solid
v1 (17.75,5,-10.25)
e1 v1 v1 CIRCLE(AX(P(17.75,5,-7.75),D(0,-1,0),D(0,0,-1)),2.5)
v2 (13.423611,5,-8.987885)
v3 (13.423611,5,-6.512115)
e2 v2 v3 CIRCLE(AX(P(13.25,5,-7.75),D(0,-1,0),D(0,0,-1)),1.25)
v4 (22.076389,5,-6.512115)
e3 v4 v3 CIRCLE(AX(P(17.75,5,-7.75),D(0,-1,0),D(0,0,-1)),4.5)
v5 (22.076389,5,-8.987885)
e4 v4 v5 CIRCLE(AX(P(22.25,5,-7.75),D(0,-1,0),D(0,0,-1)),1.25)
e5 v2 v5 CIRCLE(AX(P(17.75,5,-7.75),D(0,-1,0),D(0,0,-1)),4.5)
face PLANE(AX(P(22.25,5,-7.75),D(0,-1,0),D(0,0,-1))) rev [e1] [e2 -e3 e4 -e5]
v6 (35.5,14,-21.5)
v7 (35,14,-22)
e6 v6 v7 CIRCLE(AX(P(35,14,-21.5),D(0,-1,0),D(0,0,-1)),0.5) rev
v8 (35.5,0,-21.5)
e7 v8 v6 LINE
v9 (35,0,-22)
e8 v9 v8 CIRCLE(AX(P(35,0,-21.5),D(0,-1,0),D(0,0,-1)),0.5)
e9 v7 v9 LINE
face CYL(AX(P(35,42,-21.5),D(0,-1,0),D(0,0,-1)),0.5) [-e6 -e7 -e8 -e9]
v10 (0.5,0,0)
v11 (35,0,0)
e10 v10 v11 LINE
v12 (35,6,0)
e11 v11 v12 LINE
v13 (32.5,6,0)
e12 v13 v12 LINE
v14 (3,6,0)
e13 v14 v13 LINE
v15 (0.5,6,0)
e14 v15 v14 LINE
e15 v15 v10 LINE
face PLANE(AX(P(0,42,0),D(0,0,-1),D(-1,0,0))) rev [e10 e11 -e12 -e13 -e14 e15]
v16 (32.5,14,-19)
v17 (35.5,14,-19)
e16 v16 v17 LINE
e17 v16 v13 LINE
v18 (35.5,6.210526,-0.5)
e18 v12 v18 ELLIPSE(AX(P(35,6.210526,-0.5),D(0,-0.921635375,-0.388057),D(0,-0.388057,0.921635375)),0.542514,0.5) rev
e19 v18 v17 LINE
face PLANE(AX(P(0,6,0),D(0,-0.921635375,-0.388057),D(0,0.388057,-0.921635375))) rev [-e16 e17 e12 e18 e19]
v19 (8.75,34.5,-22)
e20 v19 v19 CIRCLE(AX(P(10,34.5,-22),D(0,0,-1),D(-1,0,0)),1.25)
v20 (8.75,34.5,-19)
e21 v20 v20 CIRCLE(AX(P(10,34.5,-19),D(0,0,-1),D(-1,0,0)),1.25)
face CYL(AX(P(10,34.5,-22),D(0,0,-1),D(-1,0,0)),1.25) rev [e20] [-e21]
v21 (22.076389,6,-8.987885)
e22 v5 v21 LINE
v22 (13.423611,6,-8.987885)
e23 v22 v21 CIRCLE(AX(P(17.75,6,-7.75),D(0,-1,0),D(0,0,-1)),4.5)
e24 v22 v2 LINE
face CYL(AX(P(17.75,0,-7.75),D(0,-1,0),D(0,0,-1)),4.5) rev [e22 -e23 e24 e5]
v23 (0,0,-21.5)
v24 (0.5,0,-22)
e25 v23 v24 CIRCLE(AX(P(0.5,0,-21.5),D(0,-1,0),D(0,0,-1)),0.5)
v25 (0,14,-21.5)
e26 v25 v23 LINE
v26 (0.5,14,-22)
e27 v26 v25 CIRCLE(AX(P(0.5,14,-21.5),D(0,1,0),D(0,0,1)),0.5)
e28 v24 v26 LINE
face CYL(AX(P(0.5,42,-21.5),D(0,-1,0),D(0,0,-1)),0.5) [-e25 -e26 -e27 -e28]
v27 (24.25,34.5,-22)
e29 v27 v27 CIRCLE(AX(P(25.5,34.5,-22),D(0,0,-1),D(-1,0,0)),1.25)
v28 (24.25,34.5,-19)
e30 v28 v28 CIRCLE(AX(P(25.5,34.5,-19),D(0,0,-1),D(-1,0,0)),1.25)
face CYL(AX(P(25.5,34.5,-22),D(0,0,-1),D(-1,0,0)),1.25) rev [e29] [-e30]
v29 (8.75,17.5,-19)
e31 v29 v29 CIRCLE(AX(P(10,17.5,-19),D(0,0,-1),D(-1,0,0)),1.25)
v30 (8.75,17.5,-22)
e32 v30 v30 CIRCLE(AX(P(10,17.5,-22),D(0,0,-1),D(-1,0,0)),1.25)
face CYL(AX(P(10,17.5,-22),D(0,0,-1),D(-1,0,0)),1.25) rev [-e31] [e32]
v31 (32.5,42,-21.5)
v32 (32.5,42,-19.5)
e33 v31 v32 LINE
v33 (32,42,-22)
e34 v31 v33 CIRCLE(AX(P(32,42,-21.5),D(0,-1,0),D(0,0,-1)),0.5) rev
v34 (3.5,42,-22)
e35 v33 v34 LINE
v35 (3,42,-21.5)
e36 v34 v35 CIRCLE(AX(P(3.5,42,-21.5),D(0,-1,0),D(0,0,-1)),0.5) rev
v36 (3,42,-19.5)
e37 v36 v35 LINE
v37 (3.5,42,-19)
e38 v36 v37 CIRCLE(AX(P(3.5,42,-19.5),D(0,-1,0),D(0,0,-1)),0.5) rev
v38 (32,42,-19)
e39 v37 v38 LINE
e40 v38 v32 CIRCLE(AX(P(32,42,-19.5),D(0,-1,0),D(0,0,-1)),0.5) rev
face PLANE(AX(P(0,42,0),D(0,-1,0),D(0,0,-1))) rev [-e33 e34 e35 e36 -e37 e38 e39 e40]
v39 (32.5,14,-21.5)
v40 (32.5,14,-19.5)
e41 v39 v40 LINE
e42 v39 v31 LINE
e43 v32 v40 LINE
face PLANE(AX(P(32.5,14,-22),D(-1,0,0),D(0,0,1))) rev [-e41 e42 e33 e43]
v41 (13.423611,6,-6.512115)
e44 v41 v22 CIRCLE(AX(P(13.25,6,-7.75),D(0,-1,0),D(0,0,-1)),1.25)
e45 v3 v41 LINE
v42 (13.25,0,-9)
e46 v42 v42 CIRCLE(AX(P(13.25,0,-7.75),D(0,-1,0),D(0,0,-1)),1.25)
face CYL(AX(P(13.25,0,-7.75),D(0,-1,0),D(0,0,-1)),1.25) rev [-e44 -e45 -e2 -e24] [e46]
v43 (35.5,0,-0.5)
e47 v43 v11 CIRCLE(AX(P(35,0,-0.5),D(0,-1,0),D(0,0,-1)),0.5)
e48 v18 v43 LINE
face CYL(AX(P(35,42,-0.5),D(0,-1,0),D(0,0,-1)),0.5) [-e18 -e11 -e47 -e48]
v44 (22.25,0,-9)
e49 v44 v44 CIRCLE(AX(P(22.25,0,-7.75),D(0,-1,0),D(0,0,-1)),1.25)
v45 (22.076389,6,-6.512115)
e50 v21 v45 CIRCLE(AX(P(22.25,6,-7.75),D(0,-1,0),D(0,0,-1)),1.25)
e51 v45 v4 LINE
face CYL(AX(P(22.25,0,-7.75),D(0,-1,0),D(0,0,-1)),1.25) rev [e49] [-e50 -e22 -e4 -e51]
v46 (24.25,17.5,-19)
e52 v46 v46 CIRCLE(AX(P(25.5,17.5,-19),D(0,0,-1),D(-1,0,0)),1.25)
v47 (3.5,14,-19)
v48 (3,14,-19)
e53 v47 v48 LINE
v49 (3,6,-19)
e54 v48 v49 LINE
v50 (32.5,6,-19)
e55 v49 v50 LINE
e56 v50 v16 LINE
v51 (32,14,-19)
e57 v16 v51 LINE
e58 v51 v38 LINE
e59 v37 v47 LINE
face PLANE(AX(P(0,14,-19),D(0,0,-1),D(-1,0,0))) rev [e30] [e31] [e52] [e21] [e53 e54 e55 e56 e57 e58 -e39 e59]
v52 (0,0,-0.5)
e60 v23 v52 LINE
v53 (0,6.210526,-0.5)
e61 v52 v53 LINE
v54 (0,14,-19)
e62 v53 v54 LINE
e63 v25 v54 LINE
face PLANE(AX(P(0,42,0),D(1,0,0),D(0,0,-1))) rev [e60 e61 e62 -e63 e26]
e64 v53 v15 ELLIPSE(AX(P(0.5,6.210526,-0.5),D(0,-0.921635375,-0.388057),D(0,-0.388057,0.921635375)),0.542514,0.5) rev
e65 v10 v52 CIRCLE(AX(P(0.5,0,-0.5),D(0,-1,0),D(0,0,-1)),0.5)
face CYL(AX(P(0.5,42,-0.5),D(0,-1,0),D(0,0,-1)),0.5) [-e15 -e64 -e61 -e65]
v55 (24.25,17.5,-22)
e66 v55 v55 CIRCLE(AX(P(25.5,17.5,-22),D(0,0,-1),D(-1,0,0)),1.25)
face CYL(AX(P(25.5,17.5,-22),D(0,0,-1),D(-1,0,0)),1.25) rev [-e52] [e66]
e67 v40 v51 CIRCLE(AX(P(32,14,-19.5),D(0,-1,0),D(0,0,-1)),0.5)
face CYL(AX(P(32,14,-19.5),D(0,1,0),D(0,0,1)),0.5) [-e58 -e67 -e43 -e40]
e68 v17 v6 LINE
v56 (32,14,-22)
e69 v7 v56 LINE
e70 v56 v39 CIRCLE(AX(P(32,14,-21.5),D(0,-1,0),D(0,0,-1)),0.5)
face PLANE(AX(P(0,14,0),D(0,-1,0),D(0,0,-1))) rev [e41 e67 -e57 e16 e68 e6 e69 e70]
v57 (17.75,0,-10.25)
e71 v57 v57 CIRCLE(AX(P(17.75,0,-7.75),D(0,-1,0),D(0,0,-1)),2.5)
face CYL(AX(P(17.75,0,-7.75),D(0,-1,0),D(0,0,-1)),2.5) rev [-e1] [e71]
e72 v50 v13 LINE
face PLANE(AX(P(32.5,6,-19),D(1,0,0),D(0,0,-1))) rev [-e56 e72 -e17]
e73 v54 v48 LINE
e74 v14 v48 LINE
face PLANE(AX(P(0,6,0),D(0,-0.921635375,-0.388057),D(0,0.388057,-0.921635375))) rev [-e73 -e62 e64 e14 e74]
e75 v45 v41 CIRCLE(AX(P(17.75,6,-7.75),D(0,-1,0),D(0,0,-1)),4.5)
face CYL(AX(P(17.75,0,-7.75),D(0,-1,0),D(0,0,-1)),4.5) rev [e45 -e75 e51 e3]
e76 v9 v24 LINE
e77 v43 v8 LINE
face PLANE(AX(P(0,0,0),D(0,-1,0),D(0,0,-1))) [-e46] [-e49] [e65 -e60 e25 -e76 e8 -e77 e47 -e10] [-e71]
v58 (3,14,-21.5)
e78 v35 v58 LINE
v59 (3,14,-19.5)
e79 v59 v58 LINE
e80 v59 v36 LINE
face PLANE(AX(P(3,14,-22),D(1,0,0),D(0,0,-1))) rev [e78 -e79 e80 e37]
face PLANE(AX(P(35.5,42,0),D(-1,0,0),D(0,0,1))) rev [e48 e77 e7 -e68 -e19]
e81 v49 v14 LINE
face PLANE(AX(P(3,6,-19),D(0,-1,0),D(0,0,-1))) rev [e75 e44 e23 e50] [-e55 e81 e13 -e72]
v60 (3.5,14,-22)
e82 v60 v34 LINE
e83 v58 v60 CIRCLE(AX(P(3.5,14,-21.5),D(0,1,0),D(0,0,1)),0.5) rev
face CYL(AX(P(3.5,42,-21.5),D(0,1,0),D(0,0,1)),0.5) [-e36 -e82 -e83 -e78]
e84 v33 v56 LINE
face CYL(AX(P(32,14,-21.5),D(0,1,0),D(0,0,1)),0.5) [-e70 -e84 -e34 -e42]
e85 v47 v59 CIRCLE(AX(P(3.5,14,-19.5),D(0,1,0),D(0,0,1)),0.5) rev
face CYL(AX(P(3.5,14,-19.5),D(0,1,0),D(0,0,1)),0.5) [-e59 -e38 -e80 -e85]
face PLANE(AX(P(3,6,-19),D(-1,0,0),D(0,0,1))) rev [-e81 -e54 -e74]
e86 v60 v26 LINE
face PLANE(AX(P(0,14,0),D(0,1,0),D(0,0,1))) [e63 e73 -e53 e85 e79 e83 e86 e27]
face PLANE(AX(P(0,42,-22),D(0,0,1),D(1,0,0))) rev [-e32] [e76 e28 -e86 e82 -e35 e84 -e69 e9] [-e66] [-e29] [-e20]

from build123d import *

# Parameters (mm, degrees)
SKETCH1_W             = 35.5
SKETCH1_H             = 22
BOSS_EXTRUDE1_DEPTH   = 42
CUT_EXTRUDE1_DEPTH    = 60.230482017
SKETCH3_W             = 3
SKETCH3_H             = 3
CUT_EXTRUDE2_DEPTH    = 28
SKETCH4_W             = 29.5
SKETCH4_H             = 10
CUT_EXTRUDE3_DEPTH    = 19
F_2_5MM_DOWEL_HOLE1_D = 2.5
F_2_5MM_DOWEL_HOLE2_D = 2.5
FILLET1_R             = 0.5


with BuildPart() as part:
    # Sketch1 → Boss-Extrude1 (new body)
    with BuildSketch(Plane(origin=(0, 0, 0), x_dir=(1, 0, 0), z_dir=(0, 1, 0))):
        with Locations((17.75, 11)):
            Rectangle(SKETCH1_W, SKETCH1_H)
    extrude(amount=BOSS_EXTRUDE1_DEPTH)

    # Sketch2 → Cut-Extrude1 (cut, through all)
    with BuildSketch(Plane(origin=(35.5, 0, 0), x_dir=(0, 0, -1), z_dir=(1, 0, 0))):
        Polygon((0, 6), (19, 14), (19, 42), (0, 42), align=None)
    extrude(amount=-CUT_EXTRUDE1_DEPTH, mode=Mode.SUBTRACT)

    # Sketch3 → Cut-Extrude2 (cut)
    with BuildSketch(Plane(origin=(0, 42, 0), x_dir=(1, 0, 0), z_dir=(0, 1, 0))):
        with Locations((1.5, 20.5)):
            Rectangle(SKETCH3_W, SKETCH3_H)
        with Locations((34, 20.5)):
            Rectangle(SKETCH3_W, SKETCH3_H)
    extrude(amount=-CUT_EXTRUDE2_DEPTH, mode=Mode.SUBTRACT)

    # Sketch4 → Cut-Extrude3 (cut)
    with BuildSketch(Plane.XY):
        with Locations((17.75, 11)):
            Rectangle(SKETCH4_W, SKETCH4_H)
    extrude(amount=-CUT_EXTRUDE3_DEPTH, mode=Mode.SUBTRACT)

    # Sketch6 → Hole1 (revolve, cut)
    with BuildSketch(Plane(origin=(17.75, 0, -7.75), x_dir=(0, 0, -1), z_dir=(1, 0, 0))):
        Polygon((0, 0), (0, 42), (4.5, 42), (4.5, 5), (2.5, 5), (2.5, 0), align=None)
    revolve(axis=Axis((17.75, 110, -7.75), (0, -1, 0)), mode=Mode.SUBTRACT)

    # Ø2.5mm Dowel Hole1 (through all)
    with Locations(Plane(origin=(0, 0, 0), x_dir=(-1, 0, 0), z_dir=(0, -1, 0))):
        with Locations((-22.25, 7.75), (-13.25, 7.75)):
            Hole(F_2_5MM_DOWEL_HOLE1_D / 2)

    # Ø2.5mm Dowel Hole2 (through all)
    with Locations(Plane(origin=(0, 0, -22), x_dir=(-1, 0, 0), z_dir=(0, 0, -1))):
        with Locations((-10, 17.5), (-25.5, 17.5), (-25.5, 34.5), (-10, 34.5)):
            Hole(F_2_5MM_DOWEL_HOLE2_D / 2)

    # Fillet1
    # the kernel refuses this fillet: 0.5 mm, written as the material it takes off along each edge
    with BuildSketch(Plane(origin=(35.5, -1.25, 0), x_dir=(-1, 0, 0), z_dir=(0, 1, 0))) as fillet1_piece_1:
        with BuildLine():
            CenterArc((FILLET1_R, -FILLET1_R), FILLET1_R, 90, 90)
            Line((0, -FILLET1_R), (0, 0))
            Line((0, 0), (FILLET1_R, 0))
        make_face()
    extrude(amount=8.5, mode=Mode.SUBTRACT)
    with BuildSketch(Plane(origin=(0, -1.25, 0), x_dir=(1, 0, 0), z_dir=(0, 1, 0))) as fillet1_piece_2:
        with BuildLine():
            CenterArc((FILLET1_R, FILLET1_R), FILLET1_R, 180, 90)
            Line((0, FILLET1_R), (0, 0))
            Line((0, 0), (FILLET1_R, 0))
        make_face()
    extrude(amount=8.5, mode=Mode.SUBTRACT)
    with BuildSketch(Plane(origin=(0, -1.25, -22), x_dir=(0, 0, 1), z_dir=(0, 1, 0))) as fillet1_piece_3:
        with BuildLine():
            CenterArc((FILLET1_R, FILLET1_R), FILLET1_R, 180, 90)
            Line((0, FILLET1_R), (0, 0))
            Line((0, 0), (FILLET1_R, 0))
        make_face()
    extrude(amount=16.5, mode=Mode.SUBTRACT)
    with BuildSketch(Plane(origin=(35.5, -1.25, -22), x_dir=(0, 0, 1), z_dir=(0, 1, 0))) as fillet1_piece_4:
        with BuildLine():
            CenterArc((FILLET1_R, -FILLET1_R), FILLET1_R, 90, 90)
            Line((0, -FILLET1_R), (0, 0))
            Line((0, 0), (FILLET1_R, 0))
        make_face()
    extrude(amount=16.5, mode=Mode.SUBTRACT)
    with BuildSketch(Plane(origin=(3, 43.25, -22), x_dir=(1, 0, 0), z_dir=(0, -1, 0))) as fillet1_piece_5:
        with BuildLine():
            CenterArc((FILLET1_R, FILLET1_R), FILLET1_R, 180, 90)
            Line((0, FILLET1_R), (0, 0))
            Line((0, 0), (FILLET1_R, 0))
        make_face()
    extrude(amount=29.25, mode=Mode.SUBTRACT)
    with BuildSketch(Plane(origin=(3, 43.25, -19), x_dir=(1, 0, 0), z_dir=(0, -1, 0)), Plane(origin=(32.5, 14, -19), x_dir=(-1, 0, 0), z_dir=(0, 1, 0)), Plane(origin=(32.5, 43.25, -22), x_dir=(-1, 0, 0), z_dir=(0, -1, 0))) as fillet1_piece_6:
        with BuildLine():
            CenterArc((FILLET1_R, -FILLET1_R), FILLET1_R, 90, 90)
            Line((0, -FILLET1_R), (0, 0))
            Line((0, 0), (FILLET1_R, 0))
        make_face()
    extrude(amount=29.25, mode=Mode.SUBTRACT)


solid = part.part
